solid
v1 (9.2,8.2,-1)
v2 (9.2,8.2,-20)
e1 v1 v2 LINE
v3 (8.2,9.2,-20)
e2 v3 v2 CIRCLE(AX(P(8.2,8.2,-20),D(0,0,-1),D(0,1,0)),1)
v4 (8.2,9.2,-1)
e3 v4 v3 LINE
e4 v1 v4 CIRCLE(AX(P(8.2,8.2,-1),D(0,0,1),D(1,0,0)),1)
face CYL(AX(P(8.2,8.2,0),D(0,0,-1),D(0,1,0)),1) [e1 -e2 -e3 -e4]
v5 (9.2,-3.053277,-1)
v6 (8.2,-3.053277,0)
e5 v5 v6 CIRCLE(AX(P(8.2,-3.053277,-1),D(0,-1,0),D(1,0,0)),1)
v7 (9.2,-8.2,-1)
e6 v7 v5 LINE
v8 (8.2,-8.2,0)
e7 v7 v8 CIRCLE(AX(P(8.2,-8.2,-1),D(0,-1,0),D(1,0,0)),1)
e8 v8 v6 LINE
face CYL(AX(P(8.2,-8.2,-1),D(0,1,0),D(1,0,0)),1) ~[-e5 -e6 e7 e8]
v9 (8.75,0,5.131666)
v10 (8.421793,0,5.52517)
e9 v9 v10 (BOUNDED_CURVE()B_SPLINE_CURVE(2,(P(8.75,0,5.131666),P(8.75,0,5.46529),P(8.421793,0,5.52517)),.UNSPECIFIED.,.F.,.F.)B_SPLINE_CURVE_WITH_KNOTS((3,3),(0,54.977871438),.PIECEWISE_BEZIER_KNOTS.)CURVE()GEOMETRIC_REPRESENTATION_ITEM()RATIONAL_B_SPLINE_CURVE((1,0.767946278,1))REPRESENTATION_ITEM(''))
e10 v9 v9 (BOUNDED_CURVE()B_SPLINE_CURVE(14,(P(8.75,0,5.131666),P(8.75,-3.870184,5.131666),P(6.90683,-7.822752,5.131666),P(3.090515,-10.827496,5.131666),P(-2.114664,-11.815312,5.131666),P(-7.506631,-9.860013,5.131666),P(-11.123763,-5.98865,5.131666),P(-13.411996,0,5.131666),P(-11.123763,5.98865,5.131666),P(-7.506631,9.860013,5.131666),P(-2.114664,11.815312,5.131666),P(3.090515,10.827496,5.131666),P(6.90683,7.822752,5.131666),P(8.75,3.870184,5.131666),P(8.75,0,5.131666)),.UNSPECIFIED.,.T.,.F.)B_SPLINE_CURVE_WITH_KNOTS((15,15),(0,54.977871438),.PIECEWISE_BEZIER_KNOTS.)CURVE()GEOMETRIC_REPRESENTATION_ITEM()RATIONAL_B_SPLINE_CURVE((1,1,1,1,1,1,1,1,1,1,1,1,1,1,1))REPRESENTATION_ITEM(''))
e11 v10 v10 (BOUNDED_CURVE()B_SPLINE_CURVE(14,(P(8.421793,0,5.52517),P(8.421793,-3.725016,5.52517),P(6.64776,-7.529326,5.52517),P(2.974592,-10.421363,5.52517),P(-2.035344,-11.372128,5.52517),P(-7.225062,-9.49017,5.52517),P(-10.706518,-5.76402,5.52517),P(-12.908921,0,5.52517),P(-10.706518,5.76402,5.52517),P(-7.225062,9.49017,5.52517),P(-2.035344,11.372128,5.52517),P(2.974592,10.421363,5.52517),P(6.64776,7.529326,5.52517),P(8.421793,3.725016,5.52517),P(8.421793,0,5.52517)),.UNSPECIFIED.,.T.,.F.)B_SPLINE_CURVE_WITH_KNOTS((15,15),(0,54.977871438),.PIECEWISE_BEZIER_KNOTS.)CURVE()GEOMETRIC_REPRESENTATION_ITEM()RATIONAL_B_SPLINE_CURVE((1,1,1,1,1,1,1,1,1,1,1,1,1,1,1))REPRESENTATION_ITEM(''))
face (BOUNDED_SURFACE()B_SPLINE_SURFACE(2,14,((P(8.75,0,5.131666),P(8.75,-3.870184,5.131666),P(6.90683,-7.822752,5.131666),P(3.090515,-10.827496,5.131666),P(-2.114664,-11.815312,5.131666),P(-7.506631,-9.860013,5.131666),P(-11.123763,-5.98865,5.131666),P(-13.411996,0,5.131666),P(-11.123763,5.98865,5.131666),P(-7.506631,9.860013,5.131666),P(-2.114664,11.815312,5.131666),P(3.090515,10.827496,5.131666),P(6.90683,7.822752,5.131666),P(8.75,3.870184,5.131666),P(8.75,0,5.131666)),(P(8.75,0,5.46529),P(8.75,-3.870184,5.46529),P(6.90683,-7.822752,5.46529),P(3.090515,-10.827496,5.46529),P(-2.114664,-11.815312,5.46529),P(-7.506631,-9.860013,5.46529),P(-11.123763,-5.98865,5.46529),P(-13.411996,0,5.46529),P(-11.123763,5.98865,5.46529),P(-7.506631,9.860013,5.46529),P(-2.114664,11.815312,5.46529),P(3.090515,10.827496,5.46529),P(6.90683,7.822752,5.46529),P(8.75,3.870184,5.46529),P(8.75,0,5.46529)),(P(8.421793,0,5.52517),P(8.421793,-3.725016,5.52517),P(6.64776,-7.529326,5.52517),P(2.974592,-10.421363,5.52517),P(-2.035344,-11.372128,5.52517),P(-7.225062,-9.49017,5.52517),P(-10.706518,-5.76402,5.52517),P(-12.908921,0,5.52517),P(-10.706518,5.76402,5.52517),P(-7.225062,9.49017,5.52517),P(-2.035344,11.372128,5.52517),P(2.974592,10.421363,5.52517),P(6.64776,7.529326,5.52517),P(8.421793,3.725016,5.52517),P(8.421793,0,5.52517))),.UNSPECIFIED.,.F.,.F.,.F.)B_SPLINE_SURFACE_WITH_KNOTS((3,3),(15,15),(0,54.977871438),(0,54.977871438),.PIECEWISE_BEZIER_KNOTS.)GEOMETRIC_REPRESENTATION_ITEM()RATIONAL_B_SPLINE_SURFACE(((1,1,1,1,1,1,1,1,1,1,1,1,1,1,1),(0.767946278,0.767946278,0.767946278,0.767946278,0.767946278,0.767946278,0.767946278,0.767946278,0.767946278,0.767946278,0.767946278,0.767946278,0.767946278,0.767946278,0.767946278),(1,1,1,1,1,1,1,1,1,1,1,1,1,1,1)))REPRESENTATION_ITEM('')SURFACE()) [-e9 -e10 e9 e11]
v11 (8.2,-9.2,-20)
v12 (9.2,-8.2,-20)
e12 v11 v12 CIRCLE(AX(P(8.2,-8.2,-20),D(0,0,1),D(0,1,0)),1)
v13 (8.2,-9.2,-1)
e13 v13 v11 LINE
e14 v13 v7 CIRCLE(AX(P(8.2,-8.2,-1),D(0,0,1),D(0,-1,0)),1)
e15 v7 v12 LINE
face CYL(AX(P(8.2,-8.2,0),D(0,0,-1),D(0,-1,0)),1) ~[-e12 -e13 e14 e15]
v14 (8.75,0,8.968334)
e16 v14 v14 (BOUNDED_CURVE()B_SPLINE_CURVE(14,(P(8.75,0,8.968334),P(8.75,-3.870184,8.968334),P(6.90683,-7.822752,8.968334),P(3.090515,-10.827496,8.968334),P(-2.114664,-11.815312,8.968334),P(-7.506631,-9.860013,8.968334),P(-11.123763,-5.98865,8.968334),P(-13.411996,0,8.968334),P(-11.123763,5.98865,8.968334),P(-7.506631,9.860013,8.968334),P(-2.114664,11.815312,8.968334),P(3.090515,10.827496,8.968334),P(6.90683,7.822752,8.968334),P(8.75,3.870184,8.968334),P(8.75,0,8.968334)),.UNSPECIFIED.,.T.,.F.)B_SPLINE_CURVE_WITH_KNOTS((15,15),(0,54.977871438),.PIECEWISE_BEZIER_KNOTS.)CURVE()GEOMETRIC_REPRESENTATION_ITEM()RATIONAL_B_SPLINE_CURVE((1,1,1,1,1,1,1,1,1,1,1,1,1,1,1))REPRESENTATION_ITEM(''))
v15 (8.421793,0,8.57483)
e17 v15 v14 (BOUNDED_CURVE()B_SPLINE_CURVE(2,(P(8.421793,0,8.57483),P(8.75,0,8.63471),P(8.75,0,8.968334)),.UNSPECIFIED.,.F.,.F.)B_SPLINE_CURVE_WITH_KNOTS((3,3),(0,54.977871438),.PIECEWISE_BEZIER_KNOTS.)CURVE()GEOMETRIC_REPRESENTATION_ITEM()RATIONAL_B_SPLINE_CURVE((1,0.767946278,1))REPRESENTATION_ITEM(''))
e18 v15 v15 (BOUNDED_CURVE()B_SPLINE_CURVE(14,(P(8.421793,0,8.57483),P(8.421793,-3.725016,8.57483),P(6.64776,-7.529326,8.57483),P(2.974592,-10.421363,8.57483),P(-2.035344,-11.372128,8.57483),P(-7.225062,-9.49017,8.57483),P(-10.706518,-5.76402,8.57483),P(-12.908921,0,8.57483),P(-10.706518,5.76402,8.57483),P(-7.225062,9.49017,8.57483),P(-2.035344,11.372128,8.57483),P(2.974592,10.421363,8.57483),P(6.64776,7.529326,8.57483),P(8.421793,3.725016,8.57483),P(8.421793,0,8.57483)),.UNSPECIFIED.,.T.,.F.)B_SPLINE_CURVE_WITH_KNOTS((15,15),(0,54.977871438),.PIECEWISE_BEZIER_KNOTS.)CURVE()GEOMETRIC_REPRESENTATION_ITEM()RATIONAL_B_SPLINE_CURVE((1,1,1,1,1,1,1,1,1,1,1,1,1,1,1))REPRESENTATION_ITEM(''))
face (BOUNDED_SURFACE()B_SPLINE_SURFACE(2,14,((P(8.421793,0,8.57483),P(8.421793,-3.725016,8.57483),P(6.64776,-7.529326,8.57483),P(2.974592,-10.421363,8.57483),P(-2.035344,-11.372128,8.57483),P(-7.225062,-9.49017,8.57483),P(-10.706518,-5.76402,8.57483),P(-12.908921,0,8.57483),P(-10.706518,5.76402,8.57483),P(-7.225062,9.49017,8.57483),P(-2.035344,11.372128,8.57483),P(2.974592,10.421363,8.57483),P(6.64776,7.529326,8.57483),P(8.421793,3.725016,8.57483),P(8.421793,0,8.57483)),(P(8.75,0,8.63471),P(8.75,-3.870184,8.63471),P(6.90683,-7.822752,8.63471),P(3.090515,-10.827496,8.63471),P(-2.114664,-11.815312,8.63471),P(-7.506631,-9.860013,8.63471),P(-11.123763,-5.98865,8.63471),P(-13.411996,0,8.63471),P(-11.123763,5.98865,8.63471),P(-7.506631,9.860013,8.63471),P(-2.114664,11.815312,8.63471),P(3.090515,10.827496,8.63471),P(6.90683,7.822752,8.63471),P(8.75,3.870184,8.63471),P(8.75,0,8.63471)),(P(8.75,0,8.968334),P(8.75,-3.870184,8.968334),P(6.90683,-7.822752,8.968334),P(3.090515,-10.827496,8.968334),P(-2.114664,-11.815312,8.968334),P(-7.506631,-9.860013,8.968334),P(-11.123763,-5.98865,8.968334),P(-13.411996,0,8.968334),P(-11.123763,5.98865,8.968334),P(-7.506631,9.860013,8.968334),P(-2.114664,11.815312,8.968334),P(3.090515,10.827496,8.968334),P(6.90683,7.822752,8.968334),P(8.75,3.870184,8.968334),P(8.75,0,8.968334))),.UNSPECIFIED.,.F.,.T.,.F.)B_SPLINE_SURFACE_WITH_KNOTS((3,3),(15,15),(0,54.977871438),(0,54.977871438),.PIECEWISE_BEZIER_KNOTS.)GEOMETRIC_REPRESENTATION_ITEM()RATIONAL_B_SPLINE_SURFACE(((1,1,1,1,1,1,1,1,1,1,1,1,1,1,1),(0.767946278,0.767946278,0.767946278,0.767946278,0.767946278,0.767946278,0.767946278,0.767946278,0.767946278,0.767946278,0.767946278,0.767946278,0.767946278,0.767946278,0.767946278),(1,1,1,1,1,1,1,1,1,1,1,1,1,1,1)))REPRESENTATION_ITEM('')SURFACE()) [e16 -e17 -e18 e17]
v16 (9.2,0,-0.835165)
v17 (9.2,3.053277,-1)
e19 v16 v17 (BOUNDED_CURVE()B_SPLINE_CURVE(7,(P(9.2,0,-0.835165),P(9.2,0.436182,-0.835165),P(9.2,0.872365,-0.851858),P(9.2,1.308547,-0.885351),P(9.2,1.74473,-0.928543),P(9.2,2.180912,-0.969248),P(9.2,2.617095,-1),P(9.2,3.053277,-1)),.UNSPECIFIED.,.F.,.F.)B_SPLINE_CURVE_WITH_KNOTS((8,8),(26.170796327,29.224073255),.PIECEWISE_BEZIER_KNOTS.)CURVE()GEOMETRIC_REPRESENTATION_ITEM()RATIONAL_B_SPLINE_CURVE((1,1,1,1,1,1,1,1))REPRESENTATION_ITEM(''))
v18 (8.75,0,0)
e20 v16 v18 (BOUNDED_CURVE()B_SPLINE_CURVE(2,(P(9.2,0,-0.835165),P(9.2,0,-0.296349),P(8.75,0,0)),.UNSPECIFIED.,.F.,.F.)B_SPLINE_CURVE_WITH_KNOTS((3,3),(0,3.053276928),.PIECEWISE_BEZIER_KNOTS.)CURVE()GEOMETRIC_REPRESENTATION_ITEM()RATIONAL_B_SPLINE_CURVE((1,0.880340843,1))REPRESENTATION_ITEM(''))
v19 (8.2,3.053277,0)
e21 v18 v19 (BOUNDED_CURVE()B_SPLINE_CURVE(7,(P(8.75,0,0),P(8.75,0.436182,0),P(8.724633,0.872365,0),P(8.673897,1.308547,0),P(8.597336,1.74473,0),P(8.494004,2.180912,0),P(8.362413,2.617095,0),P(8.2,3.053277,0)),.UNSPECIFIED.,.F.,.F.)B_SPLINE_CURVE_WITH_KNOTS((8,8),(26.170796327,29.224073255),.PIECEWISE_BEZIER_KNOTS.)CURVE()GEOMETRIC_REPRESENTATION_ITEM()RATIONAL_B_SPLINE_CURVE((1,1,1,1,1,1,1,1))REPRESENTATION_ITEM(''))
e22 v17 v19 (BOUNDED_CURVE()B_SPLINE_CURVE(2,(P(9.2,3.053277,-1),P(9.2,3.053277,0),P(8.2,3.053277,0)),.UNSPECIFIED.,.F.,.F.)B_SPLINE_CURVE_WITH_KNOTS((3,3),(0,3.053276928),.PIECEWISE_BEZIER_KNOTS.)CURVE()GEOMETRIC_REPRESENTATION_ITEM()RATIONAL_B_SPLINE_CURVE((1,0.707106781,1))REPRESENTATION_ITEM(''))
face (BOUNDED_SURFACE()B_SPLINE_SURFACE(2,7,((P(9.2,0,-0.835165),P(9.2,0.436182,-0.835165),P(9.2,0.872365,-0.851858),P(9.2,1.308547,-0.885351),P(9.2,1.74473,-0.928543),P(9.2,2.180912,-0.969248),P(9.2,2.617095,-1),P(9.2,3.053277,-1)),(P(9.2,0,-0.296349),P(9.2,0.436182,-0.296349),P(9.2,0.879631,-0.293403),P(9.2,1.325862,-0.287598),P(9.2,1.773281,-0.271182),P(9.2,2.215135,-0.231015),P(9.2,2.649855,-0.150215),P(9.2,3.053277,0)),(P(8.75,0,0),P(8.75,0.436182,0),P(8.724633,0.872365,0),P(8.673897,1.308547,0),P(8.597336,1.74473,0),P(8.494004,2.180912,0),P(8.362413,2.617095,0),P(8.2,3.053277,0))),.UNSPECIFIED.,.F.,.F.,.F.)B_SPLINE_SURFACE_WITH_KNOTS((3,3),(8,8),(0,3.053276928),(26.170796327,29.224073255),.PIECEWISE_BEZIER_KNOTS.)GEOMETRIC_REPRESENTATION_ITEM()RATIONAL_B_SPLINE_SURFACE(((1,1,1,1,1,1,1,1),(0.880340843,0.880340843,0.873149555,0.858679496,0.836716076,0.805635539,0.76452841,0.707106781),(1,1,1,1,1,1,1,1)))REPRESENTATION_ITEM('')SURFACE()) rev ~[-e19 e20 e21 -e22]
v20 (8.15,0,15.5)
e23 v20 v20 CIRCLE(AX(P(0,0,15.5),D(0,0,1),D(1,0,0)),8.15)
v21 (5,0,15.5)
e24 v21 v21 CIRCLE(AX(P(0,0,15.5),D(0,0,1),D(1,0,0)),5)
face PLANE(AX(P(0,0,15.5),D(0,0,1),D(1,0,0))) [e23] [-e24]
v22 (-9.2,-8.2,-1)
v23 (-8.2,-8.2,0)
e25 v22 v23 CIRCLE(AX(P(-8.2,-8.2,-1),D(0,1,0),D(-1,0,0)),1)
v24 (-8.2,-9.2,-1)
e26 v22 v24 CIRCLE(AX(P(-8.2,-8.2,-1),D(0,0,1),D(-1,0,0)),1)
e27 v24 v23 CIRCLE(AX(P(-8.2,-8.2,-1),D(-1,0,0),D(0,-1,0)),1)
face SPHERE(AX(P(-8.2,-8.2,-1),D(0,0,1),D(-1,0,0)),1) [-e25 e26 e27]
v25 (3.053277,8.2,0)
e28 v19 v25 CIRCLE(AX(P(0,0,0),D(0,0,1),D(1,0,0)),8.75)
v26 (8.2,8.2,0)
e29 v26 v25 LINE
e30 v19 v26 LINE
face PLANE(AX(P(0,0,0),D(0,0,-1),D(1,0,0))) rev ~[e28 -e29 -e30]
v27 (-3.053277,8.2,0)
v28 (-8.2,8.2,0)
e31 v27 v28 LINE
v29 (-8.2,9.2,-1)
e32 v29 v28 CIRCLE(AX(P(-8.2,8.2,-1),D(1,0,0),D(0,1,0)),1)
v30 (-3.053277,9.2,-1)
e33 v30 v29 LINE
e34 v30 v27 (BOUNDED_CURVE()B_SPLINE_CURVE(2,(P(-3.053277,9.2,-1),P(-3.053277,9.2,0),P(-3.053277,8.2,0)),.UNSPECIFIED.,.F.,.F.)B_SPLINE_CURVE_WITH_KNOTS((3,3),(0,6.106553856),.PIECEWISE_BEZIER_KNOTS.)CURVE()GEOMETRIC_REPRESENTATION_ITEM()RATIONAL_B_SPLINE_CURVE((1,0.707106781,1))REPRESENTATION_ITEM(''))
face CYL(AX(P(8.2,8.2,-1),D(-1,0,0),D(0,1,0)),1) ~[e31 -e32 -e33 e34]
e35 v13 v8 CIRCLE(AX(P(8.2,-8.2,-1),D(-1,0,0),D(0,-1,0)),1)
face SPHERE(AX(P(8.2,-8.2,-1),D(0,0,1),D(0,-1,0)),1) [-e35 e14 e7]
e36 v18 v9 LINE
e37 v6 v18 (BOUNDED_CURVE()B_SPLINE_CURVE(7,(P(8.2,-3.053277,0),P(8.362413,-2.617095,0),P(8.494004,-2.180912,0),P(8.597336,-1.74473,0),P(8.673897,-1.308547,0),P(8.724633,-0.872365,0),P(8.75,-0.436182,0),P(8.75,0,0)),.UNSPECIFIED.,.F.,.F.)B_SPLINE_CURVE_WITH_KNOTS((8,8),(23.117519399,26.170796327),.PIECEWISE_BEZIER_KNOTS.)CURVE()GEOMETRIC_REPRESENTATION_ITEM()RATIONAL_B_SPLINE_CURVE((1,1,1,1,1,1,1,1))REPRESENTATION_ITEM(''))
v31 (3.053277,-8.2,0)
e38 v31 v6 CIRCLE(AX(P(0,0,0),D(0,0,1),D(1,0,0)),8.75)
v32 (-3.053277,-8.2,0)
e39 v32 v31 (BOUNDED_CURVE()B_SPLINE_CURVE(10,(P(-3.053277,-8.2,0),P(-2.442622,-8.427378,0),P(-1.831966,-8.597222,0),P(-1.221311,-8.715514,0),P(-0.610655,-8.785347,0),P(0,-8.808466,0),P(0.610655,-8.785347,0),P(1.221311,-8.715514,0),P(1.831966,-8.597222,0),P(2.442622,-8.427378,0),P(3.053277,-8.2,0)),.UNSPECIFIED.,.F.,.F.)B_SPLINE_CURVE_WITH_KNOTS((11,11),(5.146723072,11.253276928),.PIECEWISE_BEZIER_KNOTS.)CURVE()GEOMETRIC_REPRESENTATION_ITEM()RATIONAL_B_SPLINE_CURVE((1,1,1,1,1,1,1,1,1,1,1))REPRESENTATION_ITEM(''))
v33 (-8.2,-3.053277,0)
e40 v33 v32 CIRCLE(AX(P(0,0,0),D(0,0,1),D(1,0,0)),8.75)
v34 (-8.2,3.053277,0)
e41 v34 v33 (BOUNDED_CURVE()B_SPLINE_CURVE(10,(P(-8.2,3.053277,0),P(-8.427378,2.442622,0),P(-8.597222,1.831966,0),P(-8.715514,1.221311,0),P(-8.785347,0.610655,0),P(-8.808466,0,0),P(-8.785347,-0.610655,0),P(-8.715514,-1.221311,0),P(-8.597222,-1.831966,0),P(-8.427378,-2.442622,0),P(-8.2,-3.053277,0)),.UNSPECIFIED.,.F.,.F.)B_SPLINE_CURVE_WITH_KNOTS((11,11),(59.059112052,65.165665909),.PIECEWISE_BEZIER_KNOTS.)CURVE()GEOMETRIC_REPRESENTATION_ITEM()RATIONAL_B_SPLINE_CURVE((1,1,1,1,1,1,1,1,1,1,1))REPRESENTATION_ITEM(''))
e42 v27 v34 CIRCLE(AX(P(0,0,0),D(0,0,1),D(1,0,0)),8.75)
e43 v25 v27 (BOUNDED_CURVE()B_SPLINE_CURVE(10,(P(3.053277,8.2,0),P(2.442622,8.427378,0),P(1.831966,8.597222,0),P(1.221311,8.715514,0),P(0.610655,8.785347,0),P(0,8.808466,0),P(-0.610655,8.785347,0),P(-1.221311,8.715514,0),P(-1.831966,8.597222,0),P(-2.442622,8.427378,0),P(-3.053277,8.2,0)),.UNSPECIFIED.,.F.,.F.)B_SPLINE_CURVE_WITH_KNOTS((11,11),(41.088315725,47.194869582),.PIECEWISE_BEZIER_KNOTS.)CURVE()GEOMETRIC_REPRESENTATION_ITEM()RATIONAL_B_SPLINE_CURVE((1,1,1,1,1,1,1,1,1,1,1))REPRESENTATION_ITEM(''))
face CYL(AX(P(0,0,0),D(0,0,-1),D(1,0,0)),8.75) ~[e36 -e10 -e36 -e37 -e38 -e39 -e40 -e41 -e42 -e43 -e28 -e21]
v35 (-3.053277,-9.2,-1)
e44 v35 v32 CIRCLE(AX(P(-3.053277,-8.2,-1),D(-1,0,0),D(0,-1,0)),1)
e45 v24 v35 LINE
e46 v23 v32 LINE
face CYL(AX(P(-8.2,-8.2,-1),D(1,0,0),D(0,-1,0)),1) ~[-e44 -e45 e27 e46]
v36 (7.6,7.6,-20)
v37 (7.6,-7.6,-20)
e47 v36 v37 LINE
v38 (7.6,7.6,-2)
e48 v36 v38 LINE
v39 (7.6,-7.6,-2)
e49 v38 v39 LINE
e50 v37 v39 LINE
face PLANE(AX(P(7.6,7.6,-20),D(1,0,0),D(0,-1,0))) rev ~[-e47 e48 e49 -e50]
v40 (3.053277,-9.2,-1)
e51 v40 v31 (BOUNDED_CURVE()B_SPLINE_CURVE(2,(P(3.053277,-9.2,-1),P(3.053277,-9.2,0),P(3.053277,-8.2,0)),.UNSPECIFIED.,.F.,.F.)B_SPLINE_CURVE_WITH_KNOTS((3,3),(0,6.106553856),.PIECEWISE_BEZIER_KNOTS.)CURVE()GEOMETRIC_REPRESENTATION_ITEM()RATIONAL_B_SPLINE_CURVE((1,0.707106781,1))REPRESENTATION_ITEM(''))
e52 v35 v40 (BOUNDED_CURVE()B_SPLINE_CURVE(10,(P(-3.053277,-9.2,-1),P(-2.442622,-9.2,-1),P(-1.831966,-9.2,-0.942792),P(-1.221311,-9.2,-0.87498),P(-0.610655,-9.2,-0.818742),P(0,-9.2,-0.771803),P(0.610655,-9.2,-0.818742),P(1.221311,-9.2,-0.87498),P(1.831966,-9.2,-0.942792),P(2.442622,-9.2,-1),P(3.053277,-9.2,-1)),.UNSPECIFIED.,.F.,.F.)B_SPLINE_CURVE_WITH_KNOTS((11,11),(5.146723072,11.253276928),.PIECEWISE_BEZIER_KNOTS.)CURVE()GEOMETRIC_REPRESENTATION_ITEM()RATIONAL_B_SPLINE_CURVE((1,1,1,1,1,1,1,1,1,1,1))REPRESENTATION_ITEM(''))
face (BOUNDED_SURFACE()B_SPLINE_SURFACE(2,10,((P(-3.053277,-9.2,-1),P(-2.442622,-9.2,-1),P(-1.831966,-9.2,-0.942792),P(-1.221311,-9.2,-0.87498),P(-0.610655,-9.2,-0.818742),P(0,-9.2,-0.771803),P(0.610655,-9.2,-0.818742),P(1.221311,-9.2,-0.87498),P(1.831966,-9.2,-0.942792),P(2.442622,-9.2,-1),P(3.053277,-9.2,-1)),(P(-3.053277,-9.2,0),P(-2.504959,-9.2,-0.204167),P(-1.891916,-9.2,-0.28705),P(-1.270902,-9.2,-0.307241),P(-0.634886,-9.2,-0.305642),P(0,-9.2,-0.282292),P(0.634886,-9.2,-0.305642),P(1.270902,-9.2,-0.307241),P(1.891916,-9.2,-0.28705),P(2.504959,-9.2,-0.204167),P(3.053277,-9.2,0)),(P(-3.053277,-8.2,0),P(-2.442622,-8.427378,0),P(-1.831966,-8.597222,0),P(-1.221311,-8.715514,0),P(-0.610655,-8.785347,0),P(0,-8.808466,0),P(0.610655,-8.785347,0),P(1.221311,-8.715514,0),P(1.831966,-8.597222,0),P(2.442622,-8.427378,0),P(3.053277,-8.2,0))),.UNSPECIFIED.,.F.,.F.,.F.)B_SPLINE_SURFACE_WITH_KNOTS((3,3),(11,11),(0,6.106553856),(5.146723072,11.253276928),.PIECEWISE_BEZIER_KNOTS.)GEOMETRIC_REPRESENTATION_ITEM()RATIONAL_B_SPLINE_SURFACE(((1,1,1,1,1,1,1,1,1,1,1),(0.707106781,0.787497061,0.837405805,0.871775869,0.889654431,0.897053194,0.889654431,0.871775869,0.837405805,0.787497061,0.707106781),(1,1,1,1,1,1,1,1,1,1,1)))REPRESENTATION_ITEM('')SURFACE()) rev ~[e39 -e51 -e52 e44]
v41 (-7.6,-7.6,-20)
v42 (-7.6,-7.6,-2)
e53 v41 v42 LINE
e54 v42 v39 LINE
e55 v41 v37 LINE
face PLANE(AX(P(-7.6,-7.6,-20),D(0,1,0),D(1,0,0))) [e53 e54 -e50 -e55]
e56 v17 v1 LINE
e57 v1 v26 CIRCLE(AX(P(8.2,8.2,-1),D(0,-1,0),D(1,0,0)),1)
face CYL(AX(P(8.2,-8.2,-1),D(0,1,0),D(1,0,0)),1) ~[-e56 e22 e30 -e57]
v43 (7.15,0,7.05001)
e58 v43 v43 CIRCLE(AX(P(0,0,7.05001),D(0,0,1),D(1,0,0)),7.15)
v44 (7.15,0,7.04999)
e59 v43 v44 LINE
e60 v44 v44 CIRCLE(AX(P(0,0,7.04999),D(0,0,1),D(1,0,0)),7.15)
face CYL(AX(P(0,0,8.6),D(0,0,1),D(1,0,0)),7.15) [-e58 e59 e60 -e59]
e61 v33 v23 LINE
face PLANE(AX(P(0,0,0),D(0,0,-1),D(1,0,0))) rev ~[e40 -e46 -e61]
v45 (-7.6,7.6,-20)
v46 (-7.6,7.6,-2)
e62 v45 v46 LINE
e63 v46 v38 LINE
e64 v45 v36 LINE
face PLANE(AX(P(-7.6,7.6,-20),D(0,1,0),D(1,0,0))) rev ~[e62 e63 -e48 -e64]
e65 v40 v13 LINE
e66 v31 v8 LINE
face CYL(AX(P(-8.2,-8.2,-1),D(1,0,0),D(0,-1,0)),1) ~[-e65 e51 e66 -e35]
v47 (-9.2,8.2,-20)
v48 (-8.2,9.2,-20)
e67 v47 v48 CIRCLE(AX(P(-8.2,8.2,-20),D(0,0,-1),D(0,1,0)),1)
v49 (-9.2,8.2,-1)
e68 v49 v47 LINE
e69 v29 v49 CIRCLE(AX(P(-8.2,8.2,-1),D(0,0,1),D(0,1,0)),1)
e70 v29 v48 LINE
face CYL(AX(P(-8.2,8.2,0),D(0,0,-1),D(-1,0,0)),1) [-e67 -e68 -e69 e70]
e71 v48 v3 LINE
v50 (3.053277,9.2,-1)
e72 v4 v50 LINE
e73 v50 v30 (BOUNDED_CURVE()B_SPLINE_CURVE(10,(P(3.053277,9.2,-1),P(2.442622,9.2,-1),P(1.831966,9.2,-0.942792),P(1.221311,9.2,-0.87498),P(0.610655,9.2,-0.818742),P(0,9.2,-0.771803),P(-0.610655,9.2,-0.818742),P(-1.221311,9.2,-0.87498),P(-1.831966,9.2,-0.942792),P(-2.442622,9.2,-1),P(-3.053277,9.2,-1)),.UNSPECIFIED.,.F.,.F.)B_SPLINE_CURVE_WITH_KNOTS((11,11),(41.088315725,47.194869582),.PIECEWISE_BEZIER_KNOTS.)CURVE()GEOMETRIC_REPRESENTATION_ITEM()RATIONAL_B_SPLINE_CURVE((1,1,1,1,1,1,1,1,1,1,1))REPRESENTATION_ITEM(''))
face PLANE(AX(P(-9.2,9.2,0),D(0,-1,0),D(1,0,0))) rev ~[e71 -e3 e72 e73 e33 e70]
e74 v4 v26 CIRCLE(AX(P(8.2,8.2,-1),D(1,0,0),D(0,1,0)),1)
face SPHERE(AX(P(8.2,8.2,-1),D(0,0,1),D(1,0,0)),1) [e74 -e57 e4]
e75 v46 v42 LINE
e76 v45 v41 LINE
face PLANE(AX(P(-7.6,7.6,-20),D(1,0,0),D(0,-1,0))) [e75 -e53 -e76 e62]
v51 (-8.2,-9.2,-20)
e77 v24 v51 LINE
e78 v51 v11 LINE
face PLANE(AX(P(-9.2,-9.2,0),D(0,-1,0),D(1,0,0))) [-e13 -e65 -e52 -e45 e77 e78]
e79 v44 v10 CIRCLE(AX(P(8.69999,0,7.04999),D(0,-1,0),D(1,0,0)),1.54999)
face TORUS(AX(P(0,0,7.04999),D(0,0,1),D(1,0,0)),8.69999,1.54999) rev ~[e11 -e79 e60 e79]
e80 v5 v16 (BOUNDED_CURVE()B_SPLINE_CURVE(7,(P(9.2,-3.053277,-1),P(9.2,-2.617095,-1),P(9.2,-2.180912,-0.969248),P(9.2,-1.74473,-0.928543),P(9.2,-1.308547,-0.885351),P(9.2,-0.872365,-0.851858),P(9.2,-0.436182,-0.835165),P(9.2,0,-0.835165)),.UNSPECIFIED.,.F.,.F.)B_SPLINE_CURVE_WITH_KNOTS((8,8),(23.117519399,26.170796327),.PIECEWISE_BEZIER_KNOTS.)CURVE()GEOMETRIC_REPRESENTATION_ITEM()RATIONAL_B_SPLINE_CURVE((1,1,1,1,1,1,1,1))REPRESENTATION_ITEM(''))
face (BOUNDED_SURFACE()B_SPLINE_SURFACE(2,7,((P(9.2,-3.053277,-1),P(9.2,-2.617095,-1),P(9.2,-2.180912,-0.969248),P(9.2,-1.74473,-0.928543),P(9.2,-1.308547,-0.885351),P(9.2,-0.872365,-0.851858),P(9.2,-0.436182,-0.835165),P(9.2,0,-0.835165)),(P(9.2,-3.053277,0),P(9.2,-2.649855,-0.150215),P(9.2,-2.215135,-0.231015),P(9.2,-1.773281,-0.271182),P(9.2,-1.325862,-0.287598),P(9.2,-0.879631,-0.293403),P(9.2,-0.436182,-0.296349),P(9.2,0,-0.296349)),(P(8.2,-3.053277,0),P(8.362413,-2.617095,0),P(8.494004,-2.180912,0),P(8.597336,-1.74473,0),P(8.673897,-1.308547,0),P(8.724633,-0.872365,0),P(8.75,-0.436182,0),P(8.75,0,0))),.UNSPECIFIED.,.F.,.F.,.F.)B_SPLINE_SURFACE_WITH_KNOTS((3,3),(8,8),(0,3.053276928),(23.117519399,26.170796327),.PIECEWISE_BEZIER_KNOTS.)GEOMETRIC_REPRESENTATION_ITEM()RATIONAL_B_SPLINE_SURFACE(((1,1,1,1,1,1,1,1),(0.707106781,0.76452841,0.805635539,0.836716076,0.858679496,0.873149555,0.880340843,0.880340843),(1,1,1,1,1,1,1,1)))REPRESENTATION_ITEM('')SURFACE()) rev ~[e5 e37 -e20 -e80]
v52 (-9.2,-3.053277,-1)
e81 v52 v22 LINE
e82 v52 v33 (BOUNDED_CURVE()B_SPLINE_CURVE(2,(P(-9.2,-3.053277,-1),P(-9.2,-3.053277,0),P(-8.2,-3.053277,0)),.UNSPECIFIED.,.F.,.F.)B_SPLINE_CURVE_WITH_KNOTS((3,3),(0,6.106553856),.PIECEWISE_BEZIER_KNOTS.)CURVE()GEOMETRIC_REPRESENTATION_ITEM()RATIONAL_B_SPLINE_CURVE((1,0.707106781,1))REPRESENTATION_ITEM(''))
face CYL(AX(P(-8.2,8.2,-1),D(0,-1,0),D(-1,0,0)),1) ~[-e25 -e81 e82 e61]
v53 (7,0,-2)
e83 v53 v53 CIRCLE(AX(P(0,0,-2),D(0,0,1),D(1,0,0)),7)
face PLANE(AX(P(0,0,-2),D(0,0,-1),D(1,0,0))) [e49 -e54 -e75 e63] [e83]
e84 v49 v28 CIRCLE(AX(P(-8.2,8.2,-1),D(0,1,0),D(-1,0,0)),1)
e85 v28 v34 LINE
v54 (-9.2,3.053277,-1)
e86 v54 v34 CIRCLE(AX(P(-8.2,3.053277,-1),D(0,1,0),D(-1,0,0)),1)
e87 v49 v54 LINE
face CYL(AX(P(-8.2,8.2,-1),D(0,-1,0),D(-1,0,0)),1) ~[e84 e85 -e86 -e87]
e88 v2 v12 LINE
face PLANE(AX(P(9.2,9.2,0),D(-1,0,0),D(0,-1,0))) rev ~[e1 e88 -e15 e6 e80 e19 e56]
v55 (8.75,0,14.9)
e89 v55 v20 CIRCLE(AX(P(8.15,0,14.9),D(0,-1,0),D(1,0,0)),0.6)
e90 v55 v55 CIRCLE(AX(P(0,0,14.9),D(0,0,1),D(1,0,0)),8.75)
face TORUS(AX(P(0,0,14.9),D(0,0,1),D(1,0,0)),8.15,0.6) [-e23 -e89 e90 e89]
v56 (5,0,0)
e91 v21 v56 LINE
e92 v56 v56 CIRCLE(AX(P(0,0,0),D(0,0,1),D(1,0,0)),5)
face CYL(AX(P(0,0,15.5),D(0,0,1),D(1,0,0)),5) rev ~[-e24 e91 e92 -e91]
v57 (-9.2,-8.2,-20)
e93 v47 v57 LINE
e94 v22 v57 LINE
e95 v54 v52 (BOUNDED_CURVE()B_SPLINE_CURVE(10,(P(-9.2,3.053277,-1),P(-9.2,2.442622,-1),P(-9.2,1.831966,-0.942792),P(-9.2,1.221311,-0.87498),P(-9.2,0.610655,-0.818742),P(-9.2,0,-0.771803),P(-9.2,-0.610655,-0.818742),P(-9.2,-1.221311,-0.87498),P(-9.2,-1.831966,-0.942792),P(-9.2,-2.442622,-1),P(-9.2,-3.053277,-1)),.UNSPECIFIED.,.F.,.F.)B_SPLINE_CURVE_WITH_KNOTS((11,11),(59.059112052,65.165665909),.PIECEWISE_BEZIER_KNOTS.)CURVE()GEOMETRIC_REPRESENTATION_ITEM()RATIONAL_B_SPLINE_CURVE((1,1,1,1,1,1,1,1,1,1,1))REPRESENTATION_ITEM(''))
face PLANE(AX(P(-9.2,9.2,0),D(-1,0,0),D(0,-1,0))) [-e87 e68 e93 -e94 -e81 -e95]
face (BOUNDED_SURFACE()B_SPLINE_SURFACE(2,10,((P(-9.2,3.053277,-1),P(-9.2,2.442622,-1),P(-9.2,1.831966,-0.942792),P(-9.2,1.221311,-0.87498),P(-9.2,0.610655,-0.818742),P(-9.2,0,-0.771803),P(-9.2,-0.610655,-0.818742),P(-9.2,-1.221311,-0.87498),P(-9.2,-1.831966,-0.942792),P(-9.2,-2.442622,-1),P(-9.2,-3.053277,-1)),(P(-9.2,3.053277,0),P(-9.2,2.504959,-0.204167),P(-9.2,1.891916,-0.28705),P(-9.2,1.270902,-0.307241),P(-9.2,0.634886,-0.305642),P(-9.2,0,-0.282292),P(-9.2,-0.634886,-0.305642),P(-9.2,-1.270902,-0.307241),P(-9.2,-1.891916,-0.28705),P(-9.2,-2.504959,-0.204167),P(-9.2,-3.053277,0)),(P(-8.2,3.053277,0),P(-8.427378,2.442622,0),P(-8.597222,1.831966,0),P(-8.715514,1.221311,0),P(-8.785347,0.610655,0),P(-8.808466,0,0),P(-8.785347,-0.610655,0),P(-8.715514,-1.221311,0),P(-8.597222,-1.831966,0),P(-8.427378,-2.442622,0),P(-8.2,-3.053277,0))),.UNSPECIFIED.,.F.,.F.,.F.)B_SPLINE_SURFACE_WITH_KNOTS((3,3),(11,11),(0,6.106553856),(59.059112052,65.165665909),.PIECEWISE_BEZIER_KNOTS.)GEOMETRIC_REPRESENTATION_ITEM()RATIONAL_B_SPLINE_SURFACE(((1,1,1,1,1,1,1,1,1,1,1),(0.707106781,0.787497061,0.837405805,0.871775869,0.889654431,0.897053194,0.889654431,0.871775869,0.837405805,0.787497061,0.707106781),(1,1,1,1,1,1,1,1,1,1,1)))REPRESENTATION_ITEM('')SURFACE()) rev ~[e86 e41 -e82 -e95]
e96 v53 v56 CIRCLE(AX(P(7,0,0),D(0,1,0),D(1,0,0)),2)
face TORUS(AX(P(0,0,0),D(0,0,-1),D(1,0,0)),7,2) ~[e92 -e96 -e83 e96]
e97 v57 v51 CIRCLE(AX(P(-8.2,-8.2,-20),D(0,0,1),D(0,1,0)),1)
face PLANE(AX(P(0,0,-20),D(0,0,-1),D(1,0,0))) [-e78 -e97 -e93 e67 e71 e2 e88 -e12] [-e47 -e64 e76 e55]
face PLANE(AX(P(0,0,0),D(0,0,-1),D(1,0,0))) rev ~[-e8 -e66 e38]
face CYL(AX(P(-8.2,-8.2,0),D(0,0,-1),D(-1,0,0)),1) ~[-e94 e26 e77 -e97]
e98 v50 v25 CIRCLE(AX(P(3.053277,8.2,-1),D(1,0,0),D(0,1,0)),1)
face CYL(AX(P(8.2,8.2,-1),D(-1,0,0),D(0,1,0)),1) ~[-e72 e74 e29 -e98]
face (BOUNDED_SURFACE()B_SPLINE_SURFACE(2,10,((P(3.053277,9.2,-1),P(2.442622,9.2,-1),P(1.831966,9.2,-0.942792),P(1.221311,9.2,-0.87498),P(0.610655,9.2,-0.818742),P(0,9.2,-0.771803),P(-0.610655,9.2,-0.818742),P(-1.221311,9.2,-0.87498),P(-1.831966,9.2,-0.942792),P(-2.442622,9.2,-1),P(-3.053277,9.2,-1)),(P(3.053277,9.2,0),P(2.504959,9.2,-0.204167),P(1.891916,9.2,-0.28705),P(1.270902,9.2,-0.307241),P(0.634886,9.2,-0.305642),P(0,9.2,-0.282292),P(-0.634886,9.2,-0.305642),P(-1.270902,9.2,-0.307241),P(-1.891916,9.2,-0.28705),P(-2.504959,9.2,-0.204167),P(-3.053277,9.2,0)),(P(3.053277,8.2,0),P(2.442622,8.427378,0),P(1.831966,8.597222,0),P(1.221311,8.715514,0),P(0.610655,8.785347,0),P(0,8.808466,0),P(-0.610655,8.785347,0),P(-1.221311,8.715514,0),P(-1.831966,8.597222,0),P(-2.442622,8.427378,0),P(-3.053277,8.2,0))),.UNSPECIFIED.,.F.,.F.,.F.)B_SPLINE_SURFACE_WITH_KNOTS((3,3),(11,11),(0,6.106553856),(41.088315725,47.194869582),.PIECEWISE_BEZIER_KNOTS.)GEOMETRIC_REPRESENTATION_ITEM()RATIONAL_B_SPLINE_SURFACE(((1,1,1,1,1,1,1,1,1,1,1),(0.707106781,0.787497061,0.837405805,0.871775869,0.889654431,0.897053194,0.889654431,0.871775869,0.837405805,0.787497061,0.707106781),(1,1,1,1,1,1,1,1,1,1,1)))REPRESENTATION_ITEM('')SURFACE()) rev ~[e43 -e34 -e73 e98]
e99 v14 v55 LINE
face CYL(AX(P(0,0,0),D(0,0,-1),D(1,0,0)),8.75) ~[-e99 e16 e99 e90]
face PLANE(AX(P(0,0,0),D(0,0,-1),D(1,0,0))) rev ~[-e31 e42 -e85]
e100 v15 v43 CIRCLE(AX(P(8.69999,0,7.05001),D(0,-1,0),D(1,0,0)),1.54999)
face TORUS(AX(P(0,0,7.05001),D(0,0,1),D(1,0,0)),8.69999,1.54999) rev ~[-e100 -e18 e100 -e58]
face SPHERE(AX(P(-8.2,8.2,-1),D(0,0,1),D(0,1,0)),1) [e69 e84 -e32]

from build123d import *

# Parameters (mm, degrees)
F0_R      = 8.75
F1_DEPTH  = 15.5
F3_START  = -6.9
F2_R      = 12.7162229671
F2_R_2    = 7.15
F3_DEPTH  = 3.1
F4_W      = 18.4
F4_H      = 18.4
F5_DEPTH  = 20
F6_W      = 15.2
F6_H      = 15.2
F7_DEPTH  = 18
F8_R      = 0.6
F9_R      = 1.54999
F10_R     = 1
F11_R     = 5
F12_DEPTH = 25
F13_R     = 2
F14_R     = 1
F15_R     = 0.4


# Not quite as in the source:
# - a fillet or chamfer is up to 0.001 mm smaller than in the source, because OpenCascade refuses the exact size


with BuildPart() as f1:
    # F0 (on Top) → F1 (new body)
    with BuildSketch(Plane.XY):
        Circle(F0_R)
    extrude(amount=F1_DEPTH)

    # F2 (on face) → F3 (cut)
    with BuildSketch(Plane.XY.offset(15.5).offset(F3_START)):
        Circle(F2_R)
        Circle(F2_R_2, mode=Mode.SUBTRACT)
    extrude(amount=-F3_DEPTH, mode=Mode.SUBTRACT)

    # F4 (on face) → F5 (join)
    with BuildSketch(Plane(origin=(0, 0, 0), x_dir=(1, 0, 0), z_dir=(0, 0, -1))):
        Rectangle(F4_W, F4_H)
    extrude(amount=F5_DEPTH)

    # F6 (on face) → F7 (cut)
    with BuildSketch(Plane(origin=(0, 0, -20), x_dir=(1, 0, 0), z_dir=(0, 0, -1))):
        Rectangle(F6_W, F6_H)
    extrude(amount=-F7_DEPTH, mode=Mode.SUBTRACT)

    # F8
    f8_edges = [f1.edges().sort_by_distance(p)[0] for p in [
        (-8.75, 0, 15.5),
    ]]
    fillet(f8_edges, radius=F8_R)

    # F9 (radius 1.55 in the source; OpenCascade refuses exactly that, so slightly less here)
    f9_edges = [f1.edges().sort_by_distance(p)[0] for p in [
        (-7.15, 0, 5.5),
        (-7.15, 0, 8.6),
    ]]
    fillet(f9_edges, radius=F9_R)

    # F10
    f10_edges = [f1.edges().sort_by_distance(p)[0] for p in [
        (9.2, -9.2, -10),
        (9.2, 9.2, -10),
        (-9.2, 9.2, -10),
        (-9.2, -9.2, -10),
    ]]
    fillet(f10_edges, radius=F10_R)

    # F11 (on face) → F12 (cut)
    with BuildSketch(Plane.XY.offset(15.5)):
        Circle(F11_R)
    extrude(amount=-F12_DEPTH, mode=Mode.SUBTRACT)

    # F13
    f13_edges = [f1.edges().sort_by_distance(p)[0] for p in [
        (-5, 0, -2),
    ]]
    fillet(f13_edges, radius=F13_R)

    # F14
    f14_edges = [f1.edges().sort_by_distance(p)[0] for p in [
        (0, -9.2, 0),
    ]]
    fillet(f14_edges, radius=F14_R)

    # F15
    f15_edges = [f1.edges().sort_by_distance(p)[0] for p in [
        (-8.75, 0, 8.6),
        (-8.75, 0, 5.5),
    ]]
    fillet(f15_edges, radius=F15_R)


solid = f1.part
